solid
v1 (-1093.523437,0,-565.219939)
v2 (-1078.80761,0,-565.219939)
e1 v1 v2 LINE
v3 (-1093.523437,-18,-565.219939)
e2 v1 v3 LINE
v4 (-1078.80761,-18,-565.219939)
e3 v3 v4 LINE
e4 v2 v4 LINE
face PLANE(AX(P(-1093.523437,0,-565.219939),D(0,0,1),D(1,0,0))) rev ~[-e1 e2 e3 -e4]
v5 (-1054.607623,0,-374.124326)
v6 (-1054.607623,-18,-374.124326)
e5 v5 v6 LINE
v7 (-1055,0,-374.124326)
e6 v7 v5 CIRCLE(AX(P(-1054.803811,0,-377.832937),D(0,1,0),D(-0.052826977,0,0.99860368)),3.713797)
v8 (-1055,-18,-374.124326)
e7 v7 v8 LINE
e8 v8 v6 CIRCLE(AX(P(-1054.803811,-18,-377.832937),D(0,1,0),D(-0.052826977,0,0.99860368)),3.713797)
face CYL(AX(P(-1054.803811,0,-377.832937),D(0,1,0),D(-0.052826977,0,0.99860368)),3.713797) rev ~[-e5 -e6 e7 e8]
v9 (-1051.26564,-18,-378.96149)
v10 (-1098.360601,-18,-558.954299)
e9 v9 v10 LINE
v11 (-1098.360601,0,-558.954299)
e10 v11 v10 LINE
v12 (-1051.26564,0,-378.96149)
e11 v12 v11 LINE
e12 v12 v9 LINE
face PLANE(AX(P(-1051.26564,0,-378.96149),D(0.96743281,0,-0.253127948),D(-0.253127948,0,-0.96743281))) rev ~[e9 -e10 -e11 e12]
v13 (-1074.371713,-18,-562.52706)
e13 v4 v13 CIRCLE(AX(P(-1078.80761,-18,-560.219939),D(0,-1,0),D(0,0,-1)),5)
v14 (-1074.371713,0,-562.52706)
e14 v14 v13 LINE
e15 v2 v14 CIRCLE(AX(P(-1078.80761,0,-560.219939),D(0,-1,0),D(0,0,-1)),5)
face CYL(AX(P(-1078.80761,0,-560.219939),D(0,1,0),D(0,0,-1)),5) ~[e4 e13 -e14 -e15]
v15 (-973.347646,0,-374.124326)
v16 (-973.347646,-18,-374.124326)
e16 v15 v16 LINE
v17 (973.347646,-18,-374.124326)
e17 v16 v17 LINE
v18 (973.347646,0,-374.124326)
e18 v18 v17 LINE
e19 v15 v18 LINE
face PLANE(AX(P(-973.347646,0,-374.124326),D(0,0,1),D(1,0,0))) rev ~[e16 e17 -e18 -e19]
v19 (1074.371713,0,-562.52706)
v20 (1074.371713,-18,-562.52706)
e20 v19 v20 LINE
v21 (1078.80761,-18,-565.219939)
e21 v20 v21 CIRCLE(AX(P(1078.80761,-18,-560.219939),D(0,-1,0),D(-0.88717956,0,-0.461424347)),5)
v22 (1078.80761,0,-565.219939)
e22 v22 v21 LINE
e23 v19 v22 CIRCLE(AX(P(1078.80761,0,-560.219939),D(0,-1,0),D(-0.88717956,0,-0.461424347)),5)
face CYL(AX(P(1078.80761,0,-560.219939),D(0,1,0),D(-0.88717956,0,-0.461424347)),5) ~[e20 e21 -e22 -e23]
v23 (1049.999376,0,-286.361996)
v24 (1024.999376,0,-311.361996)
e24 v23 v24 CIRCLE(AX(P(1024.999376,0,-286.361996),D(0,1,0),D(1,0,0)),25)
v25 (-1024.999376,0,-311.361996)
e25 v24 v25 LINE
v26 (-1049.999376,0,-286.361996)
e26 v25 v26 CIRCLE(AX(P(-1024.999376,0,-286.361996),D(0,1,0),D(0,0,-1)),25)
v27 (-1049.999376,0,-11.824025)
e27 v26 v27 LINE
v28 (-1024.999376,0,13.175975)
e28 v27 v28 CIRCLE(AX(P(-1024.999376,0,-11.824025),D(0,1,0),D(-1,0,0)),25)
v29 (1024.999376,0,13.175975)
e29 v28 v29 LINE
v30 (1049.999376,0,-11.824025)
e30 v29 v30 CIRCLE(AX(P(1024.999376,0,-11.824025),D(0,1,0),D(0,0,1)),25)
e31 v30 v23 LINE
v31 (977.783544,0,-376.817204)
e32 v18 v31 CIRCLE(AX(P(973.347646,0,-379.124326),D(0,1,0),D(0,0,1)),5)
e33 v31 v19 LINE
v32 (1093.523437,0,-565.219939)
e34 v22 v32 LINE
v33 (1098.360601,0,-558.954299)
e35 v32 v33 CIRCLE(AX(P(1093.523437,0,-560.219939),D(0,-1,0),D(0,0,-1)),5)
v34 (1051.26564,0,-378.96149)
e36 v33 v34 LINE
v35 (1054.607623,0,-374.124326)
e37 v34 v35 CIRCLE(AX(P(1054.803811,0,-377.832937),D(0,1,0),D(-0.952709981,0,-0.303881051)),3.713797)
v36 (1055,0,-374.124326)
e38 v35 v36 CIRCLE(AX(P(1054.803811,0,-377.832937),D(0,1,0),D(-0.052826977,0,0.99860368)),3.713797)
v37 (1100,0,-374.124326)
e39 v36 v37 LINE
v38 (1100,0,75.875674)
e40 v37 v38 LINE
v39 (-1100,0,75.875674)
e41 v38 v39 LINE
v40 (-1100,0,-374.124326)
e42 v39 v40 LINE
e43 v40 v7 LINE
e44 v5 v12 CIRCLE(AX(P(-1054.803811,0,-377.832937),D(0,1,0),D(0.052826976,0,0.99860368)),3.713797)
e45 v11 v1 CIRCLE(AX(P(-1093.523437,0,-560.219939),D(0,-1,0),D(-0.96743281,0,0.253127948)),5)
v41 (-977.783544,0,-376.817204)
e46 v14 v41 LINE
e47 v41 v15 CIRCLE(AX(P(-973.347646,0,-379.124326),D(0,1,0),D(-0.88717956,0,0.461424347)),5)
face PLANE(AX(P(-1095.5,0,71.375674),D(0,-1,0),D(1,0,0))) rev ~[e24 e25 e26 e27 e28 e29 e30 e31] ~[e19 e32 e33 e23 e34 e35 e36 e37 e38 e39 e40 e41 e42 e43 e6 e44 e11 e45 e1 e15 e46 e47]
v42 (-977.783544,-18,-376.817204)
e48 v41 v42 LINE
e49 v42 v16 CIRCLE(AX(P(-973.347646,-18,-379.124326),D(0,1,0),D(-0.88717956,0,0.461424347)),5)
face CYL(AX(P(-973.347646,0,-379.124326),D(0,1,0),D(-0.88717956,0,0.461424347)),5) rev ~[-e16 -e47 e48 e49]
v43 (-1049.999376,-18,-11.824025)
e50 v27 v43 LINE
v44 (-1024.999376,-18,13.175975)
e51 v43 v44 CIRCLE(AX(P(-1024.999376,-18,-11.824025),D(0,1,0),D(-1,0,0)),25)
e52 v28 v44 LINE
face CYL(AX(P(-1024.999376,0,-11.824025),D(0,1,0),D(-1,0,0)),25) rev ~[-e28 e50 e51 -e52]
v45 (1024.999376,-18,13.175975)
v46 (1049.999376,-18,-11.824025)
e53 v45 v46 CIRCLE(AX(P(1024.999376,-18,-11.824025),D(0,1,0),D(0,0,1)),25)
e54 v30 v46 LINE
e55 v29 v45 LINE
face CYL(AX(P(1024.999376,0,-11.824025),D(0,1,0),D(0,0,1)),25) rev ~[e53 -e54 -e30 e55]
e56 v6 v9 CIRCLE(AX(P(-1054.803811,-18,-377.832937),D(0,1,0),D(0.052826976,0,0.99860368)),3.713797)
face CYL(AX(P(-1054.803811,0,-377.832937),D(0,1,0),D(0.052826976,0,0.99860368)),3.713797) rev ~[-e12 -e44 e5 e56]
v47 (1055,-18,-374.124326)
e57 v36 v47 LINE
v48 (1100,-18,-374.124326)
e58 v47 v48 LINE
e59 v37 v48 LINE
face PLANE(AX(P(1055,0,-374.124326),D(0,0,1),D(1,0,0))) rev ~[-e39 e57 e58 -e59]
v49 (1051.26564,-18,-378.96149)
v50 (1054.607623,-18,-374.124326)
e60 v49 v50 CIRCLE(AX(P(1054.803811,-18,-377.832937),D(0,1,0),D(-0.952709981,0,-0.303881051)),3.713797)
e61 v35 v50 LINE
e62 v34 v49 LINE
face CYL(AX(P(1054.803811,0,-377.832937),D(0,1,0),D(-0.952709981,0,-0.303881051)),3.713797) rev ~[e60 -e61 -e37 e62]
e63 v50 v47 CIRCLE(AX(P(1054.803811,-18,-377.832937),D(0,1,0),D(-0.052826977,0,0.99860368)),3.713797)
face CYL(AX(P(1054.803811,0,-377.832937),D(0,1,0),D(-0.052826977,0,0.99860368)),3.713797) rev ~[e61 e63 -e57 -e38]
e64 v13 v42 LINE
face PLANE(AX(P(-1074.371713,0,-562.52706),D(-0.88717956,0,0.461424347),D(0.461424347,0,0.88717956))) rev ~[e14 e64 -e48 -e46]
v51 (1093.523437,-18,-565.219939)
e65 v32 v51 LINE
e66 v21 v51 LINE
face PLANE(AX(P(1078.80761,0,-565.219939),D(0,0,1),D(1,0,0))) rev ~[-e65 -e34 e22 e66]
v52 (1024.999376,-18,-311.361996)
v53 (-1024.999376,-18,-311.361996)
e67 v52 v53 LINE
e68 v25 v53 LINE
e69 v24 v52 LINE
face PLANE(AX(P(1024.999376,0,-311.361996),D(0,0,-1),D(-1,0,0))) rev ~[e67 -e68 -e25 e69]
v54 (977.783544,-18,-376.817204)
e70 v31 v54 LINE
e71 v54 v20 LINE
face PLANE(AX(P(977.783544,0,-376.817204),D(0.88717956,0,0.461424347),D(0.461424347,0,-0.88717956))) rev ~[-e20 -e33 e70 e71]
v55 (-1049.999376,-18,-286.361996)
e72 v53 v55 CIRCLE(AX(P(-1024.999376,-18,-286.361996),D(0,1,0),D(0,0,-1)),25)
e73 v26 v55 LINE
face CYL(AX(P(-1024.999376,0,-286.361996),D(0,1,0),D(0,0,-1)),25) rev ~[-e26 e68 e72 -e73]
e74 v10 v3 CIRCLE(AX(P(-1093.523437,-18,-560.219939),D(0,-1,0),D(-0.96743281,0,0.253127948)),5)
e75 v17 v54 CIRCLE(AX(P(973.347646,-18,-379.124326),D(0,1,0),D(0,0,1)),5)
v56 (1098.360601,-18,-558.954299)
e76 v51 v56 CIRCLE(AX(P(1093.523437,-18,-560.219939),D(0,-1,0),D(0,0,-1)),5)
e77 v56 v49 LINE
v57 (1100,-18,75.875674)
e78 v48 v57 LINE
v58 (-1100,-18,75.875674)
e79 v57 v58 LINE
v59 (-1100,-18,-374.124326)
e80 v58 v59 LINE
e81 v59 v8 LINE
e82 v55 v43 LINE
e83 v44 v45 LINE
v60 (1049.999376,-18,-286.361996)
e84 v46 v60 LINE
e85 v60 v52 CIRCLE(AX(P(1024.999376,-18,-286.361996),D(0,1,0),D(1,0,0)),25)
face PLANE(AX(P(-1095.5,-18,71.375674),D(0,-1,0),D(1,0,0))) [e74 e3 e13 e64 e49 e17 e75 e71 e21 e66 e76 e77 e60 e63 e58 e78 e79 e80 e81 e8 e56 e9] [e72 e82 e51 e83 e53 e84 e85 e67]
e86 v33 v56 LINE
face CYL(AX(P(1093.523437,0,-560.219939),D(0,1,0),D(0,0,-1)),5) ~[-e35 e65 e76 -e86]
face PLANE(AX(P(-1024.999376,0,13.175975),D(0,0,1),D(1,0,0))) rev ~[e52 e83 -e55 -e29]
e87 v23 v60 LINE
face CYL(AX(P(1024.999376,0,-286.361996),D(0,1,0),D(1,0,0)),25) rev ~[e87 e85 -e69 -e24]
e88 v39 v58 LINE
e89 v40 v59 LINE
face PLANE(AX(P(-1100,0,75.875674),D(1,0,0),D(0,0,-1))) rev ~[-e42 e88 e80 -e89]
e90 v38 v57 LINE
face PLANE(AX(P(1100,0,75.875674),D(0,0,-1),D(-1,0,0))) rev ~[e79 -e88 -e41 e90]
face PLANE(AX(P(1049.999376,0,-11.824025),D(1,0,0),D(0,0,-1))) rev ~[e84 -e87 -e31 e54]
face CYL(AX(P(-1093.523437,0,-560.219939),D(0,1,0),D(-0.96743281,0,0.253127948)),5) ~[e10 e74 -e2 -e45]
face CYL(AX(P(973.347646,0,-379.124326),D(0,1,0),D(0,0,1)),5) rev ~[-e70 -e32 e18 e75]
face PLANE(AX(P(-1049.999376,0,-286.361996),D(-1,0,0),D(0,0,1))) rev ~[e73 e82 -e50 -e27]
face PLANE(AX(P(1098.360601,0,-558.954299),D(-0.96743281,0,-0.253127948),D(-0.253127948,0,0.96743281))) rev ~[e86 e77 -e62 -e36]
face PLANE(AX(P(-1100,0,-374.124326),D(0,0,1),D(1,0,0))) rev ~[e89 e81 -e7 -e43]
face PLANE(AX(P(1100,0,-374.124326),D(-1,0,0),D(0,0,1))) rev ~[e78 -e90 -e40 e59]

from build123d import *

# Parameters (mm, degrees)
F0_W     = 9
F0_H     = 9
F0_H_2   = 432
F1_DEPTH = 18


# Not quite as in the source:
# - a feature names something its author has since deleted; it is built from what else it names


with BuildPart() as f1:
    # F0 (on Front) → F1 (new body)
    with BuildSketch(Plane.XZ):
        with Locations((-1095.5, 71.3756743552)):
            Rectangle(F0_W, F0_H)
        with BuildLine():
            Line((-973.3476458471, -374.1243256448), (-1054.6076226562, -374.1243256448))
            ThreePointArc((-1054.6076226562, -374.1243256448), (-1051.7483407187, -375.721921149), (-1051.265639742, -378.9614896944))
            Line((-1051.265639742, -378.9614896944), (-1098.3606008427, -558.954299013))
            ThreePointArc((-1098.3606008427, -558.954299013), (-1097.4812264988, -563.2754093644), (-1093.523436793, -565.219938755))
            Line((-1093.523436793, -565.219938755), (-1078.8076104242, -565.219938755))
            ThreePointArc((-1078.8076104242, -565.219938755), (-1076.2129629213, -564.4940239596), (-1074.371712623, -562.5270604893))
            Line((-1074.371712623, -562.5270604893), (-977.7835436484, -376.8172039105))
            ThreePointArc((-977.7835436484, -376.8172039105), (-975.94229335, -374.8502404402), (-973.3476458471, -374.1243256448))
        make_face()
        with BuildLine():
            Line((0, -365.1243256448), (-1091, -365.1243256448))
            Line((-1091, -365.1243256448), (-1091, -374.1243256448))
            Line((-1091, -374.1243256448), (-1055, -374.1243256448))
            ThreePointArc((-1055, -374.1243256448), (-1054.8038113281, -374.1191399972), (-1054.6076226562, -374.1243256448))
            Line((-1054.6076226562, -374.1243256448), (-973.3476458471, -374.1243256448))
            Line((-973.3476458471, -374.1243256448), (0, -374.1243256448))
            Line((0, -374.1243256448), (973.3476458471, -374.1243256448))
            Line((973.3476458471, -374.1243256448), (1054.6076226562, -374.1243256448))
            ThreePointArc((1054.6076226562, -374.1243256448), (1054.8038113281, -374.1191399972), (1055, -374.1243256448))
            Line((1055, -374.1243256448), (1100, -374.1243256448))
            Line((1100, -374.1243256448), (1100, 66.8756743552))
            Line((1100, 66.8756743552), (1091, 66.8756743552))
            Line((1091, 66.8756743552), (1091, -365.0378882885))
            Line((1091, -365.0378882885), (1091, -365.1243256448))
            Line((1091, -365.1243256448), (0, -365.1243256448))
        make_face()
        Polygon((0, 75.8756743552), (-1091, 75.8756743552), (-1091, 66.8756743552), (0, 66.8756743552), (1091, 66.8756743552), (1091, 75.8756743552), align=None)
        with Locations((-1095.5, -149.1243256448)):
            Rectangle(F0_W, F0_H_2)
        with Locations((-1095.5, -369.6243256448)):
            Rectangle(F0_W, F0_H)
        with Locations((1095.5, 71.3756743552)):
            Rectangle(F0_W, F0_H)
        with BuildLine():
            ThreePointArc((1051.265639742, -378.9614896944), (1051.7483407187, -375.721921149), (1054.6076226562, -374.1243256448))
            Line((1054.6076226562, -374.1243256448), (973.3476458471, -374.1243256448))
            ThreePointArc((973.3476458471, -374.1243256448), (975.94229335, -374.8502404402), (977.7835436484, -376.8172039105))
            Line((977.7835436484, -376.8172039105), (1074.371712623, -562.5270604893))
            ThreePointArc((1074.371712623, -562.5270604893), (1076.2129629213, -564.4940239596), (1078.8076104242, -565.219938755))
            Line((1078.8076104242, -565.219938755), (1093.523436793, -565.219938755))
            ThreePointArc((1093.523436793, -565.219938755), (1097.4812264988, -563.2754093644), (1098.3606008427, -558.954299013))
            Line((1098.3606008427, -558.954299013), (1051.265639742, -378.9614896944))
        make_face()
        Polygon((0, 66.8756743552), (-1091, 66.8756743552), (-1091, -365.1243256448), (0, -365.1243256448), (1091, -365.1243256448), (1091, -365.0378882885), (1091, 66.8756743552), align=None)
        with BuildLine():
            Line((-1049.9993757457, -21.1739316583), (-1049.9993757457, -21.1230870336))
            Line((-1049.9993757457, -21.1230870336), (-1049.9993757457, -11.824025))
            ThreePointArc((-1049.9993757457, -11.824025), (-1042.6770452754, 5.8536445296), (-1024.9993757457, 13.175975))
            Line((-1024.9993757457, 13.175975), (1024.9993757457, 13.175975))
            ThreePointArc((1024.9993757457, 13.175975), (1042.6770452754, 5.8536445296), (1049.9993757457, -11.824025))
            Line((1049.9993757457, -11.824025), (1049.9993757457, -286.3619962875))
            ThreePointArc((1049.9993757457, -286.3619962875), (1042.6770452754, -304.0396658171), (1024.9993757457, -311.3619962875))
            Line((1024.9993757457, -311.3619962875), (-1024.9993757457, -311.3619962875))
            ThreePointArc((-1024.9993757457, -311.3619962875), (-1042.6770452754, -304.0396658171), (-1049.9993757457, -286.3619962875))
            Line((-1049.9993757457, -286.3619962875), (-1049.9993757457, -21.1739316583))
        make_face(mode=Mode.SUBTRACT)
    extrude(amount=F1_DEPTH)


solid = f1.part
